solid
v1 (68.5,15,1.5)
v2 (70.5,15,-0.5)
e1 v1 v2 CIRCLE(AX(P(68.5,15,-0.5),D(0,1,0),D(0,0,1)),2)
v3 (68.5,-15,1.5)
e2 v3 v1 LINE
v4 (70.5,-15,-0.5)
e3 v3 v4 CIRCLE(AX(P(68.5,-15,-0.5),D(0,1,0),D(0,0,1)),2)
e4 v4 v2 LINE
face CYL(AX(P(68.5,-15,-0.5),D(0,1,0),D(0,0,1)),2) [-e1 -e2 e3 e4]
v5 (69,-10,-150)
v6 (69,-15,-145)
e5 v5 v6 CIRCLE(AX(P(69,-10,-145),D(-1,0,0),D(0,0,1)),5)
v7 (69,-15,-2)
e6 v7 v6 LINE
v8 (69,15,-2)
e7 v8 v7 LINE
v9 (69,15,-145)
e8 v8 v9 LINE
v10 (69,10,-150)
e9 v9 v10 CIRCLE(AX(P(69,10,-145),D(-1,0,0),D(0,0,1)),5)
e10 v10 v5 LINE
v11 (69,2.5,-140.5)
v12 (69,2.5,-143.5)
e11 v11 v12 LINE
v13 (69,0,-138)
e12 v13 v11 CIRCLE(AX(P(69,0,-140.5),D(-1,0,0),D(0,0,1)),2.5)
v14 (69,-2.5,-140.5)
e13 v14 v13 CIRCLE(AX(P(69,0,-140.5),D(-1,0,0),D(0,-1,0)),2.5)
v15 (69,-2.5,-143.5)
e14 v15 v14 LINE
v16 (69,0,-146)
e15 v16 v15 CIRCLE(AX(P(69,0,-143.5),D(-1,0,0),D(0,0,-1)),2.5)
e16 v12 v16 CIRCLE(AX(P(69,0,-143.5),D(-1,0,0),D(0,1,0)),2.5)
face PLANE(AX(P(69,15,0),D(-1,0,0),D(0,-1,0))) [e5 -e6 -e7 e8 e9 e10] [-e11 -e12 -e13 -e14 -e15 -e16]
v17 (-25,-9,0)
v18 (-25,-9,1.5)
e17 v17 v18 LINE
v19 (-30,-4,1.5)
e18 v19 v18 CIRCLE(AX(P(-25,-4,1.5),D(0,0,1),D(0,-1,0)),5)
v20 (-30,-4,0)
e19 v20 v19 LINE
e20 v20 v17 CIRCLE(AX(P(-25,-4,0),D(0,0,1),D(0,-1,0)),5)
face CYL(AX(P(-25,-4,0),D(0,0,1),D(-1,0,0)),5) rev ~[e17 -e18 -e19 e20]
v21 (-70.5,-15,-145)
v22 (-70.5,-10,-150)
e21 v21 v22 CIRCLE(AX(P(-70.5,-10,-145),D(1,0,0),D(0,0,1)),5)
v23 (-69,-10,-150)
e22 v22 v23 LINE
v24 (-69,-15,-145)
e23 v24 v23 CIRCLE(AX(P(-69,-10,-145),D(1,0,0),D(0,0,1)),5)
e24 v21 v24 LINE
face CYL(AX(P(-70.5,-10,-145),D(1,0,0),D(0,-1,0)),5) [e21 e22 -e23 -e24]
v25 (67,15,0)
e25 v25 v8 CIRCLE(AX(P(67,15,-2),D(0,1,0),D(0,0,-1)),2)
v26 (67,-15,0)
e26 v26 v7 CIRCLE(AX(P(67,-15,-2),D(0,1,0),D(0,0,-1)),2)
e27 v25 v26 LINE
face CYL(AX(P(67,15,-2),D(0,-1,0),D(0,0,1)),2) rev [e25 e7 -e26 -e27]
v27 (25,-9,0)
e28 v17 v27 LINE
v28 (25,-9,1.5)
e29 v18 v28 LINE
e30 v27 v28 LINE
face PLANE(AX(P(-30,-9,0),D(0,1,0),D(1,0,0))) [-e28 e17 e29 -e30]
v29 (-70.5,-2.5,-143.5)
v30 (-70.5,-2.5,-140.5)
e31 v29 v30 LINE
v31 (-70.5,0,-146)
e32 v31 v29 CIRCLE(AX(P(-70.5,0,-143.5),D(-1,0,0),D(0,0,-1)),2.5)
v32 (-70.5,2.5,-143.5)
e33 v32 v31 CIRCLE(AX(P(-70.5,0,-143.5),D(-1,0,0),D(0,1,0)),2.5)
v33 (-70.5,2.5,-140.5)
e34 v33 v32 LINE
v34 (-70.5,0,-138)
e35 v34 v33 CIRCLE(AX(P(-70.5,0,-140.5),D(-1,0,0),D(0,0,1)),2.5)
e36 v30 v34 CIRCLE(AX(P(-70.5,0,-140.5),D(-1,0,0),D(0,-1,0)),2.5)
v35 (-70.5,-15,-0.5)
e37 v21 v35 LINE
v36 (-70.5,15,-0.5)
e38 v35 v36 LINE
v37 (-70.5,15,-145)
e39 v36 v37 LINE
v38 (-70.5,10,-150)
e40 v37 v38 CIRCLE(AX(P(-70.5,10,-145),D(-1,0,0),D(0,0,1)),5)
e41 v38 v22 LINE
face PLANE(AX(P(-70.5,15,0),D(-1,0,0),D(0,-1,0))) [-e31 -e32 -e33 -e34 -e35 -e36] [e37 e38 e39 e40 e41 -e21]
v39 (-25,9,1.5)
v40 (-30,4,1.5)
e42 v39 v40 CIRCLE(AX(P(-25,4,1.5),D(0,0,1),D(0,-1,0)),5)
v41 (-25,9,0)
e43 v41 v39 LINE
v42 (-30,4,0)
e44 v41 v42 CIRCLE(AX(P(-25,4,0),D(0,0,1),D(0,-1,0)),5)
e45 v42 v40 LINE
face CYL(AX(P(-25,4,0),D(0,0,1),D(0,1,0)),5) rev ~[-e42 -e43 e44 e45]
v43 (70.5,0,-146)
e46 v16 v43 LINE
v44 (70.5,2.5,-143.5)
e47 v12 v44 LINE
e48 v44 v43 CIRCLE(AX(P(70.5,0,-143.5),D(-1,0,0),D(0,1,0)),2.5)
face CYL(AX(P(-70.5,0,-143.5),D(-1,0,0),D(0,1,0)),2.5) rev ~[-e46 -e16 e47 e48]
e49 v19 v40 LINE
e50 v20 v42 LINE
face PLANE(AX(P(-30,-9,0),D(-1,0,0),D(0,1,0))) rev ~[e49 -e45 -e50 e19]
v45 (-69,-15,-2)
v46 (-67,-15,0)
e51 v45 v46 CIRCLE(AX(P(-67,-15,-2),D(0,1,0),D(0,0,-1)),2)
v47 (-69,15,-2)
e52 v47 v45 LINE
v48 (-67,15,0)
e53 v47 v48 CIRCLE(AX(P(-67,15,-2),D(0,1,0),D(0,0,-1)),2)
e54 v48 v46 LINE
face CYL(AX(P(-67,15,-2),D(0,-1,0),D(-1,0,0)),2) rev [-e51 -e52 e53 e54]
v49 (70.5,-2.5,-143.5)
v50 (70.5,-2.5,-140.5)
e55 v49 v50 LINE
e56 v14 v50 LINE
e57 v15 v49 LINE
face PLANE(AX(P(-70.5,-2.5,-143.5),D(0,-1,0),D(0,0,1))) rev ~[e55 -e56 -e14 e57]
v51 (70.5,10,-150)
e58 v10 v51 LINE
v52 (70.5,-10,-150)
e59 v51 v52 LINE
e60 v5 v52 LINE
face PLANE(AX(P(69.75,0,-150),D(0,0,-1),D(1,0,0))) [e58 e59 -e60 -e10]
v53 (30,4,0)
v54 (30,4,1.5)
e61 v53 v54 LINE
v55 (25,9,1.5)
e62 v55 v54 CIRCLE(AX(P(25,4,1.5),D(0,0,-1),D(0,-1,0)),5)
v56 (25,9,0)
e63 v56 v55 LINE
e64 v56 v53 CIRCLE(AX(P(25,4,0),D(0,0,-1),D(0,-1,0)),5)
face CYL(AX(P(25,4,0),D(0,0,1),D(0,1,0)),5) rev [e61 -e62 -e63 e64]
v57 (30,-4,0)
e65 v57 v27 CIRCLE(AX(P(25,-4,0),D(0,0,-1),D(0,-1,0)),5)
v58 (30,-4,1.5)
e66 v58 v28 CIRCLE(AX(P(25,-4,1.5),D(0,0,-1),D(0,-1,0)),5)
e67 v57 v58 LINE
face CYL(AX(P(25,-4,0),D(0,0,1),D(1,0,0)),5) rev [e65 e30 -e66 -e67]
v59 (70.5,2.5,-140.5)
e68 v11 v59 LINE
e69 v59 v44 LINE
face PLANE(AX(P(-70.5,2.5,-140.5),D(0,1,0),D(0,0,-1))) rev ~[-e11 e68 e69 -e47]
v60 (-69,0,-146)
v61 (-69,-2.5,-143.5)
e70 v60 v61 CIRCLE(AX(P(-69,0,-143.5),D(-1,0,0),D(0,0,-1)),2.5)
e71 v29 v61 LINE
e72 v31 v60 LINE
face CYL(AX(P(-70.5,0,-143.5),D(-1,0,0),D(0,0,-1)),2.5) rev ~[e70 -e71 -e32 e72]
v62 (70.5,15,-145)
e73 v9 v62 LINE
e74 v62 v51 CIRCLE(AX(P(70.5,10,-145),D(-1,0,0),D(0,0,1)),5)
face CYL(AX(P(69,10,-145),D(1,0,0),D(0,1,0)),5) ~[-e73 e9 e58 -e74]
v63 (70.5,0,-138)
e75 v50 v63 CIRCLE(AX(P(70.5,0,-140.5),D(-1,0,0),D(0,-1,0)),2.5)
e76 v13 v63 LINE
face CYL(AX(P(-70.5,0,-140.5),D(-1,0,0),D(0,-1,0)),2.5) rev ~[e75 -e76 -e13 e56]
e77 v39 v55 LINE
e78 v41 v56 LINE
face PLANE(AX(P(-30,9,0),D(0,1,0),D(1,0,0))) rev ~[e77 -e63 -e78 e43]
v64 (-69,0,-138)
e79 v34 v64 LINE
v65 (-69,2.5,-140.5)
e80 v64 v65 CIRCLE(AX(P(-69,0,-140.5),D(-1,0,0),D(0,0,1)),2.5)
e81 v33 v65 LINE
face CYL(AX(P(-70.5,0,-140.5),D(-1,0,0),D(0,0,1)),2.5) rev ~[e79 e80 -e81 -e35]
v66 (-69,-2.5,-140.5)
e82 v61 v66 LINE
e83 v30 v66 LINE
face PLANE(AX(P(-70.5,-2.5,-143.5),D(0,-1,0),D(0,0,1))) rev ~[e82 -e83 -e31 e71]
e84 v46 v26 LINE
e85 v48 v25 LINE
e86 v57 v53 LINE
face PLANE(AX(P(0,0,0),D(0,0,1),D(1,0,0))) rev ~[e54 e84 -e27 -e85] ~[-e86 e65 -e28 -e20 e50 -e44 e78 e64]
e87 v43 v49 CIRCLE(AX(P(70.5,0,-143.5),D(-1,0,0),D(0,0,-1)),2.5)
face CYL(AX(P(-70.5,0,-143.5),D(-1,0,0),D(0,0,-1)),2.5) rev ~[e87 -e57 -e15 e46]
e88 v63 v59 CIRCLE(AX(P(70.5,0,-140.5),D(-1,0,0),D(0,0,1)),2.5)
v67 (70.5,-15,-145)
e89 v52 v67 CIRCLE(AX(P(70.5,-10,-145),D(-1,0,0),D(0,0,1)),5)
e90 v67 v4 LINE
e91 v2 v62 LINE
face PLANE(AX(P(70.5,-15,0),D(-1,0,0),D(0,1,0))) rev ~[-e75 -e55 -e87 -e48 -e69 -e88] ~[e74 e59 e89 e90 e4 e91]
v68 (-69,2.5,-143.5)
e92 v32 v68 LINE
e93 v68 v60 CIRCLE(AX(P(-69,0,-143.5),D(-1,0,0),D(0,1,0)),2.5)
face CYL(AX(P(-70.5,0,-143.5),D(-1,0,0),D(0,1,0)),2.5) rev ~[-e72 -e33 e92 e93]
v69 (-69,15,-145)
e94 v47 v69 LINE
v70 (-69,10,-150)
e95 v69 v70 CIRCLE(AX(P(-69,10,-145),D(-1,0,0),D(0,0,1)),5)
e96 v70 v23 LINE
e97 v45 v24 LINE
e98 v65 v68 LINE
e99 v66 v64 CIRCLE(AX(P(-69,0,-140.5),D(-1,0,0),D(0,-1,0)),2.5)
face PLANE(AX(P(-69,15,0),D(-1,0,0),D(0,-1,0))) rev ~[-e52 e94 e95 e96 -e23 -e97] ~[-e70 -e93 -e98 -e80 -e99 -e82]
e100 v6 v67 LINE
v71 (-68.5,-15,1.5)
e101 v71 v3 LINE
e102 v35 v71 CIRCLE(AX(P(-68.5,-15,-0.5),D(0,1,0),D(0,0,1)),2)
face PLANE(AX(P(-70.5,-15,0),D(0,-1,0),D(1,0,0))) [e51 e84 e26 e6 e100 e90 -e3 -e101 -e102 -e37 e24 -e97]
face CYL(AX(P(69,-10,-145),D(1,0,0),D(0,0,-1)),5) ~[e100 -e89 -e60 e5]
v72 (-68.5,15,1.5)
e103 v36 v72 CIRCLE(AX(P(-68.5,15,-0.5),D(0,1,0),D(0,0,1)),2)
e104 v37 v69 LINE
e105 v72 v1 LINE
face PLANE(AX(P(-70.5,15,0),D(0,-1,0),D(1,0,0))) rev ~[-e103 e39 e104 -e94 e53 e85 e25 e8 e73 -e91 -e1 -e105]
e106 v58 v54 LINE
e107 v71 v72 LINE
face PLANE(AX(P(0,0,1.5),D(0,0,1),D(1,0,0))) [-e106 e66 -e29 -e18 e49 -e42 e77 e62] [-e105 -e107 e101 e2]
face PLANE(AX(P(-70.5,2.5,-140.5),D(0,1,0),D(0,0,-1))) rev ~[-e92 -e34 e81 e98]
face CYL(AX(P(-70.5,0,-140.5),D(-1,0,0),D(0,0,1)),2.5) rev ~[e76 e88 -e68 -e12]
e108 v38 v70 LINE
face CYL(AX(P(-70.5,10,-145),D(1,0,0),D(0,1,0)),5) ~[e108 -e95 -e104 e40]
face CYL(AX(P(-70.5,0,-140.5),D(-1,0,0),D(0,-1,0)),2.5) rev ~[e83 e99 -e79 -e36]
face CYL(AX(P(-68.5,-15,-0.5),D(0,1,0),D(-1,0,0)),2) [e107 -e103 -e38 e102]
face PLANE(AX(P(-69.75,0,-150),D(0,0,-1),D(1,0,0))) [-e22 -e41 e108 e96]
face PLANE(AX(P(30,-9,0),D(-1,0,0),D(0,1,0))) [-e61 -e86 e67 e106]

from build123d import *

# Parameters (mm, degrees)
F0_W     = 141
F0_H     = 30
F0_W_2   = 60
F0_H_2   = 18
F1_DEPTH = 1.5
F2_W     = 1.5
F2_H     = 30
F3_DEPTH = 150
F4_R     = 5
F7_DEPTH = 200
F8_R     = 2


# Not quite as in the source:
# - two fillets or chamfers of one size are made in one step


with BuildPart() as f1:
    # F0 (on Top) → F1 (new body)
    with BuildSketch(Plane.XY):
        Rectangle(F0_W, F0_H)
        Rectangle(F0_W_2, F0_H_2, mode=Mode.SUBTRACT)
    extrude(amount=F1_DEPTH)

    # F2 (on face) → F3 (join)
    with BuildSketch(Plane(origin=(0, 0, 0), x_dir=(1, 0, 0), z_dir=(0, 0, -1))):
        with Locations((-69.75, 0)):
            Rectangle(F2_W, F2_H)
        with Locations((69.75, 0)):
            Rectangle(F2_W, F2_H)
    extrude(amount=F3_DEPTH)

    # F4
    f4_edges = [f1.edges().sort_by_distance(p)[0] for p in [
        (30, 9, 0.75),
        (30, -9, 0.75),
        (-30, -9, 0.75),
        (-30, 9, 0.75),
        (-69.75, 15, -150),
        (69.75, 15, -150),
        (69.75, -15, -150),
        (-69.75, -15, -150),
    ]]
    fillet(f4_edges, radius=F4_R)

    # F6 (on face) → F7 (cut)
    with BuildSketch(Plane(origin=(-70.5, 0, 0), x_dir=(0, -1, 0), z_dir=(-1, 0, 0))):
        with BuildLine():
            Line((-2.5, -140.5), (-2.5, -143.5))
            ThreePointArc((-2.5, -143.5), (-1.767766953, -145.267766953), (0, -146))
            ThreePointArc((0, -146), (1.767766953, -145.267766953), (2.5, -143.5))
            Line((2.5, -143.5), (2.5, -140.5))
            ThreePointArc((2.5, -140.5), (1.767766953, -138.732233047), (0, -138))
            ThreePointArc((0, -138), (-1.767766953, -138.732233047), (-2.5, -140.5))
        make_face()
    extrude(amount=-F7_DEPTH, mode=Mode.SUBTRACT)

    # F8
    f8_edges = [f1.edges().sort_by_distance(p)[0] for p in [
        (70.5, 0, 1.5),
        (-70.5, 0, 1.5),
        (-69, 0, 0),
        (69, 0, 0),
    ]]
    fillet(f8_edges, radius=F8_R)


solid = f1.part
